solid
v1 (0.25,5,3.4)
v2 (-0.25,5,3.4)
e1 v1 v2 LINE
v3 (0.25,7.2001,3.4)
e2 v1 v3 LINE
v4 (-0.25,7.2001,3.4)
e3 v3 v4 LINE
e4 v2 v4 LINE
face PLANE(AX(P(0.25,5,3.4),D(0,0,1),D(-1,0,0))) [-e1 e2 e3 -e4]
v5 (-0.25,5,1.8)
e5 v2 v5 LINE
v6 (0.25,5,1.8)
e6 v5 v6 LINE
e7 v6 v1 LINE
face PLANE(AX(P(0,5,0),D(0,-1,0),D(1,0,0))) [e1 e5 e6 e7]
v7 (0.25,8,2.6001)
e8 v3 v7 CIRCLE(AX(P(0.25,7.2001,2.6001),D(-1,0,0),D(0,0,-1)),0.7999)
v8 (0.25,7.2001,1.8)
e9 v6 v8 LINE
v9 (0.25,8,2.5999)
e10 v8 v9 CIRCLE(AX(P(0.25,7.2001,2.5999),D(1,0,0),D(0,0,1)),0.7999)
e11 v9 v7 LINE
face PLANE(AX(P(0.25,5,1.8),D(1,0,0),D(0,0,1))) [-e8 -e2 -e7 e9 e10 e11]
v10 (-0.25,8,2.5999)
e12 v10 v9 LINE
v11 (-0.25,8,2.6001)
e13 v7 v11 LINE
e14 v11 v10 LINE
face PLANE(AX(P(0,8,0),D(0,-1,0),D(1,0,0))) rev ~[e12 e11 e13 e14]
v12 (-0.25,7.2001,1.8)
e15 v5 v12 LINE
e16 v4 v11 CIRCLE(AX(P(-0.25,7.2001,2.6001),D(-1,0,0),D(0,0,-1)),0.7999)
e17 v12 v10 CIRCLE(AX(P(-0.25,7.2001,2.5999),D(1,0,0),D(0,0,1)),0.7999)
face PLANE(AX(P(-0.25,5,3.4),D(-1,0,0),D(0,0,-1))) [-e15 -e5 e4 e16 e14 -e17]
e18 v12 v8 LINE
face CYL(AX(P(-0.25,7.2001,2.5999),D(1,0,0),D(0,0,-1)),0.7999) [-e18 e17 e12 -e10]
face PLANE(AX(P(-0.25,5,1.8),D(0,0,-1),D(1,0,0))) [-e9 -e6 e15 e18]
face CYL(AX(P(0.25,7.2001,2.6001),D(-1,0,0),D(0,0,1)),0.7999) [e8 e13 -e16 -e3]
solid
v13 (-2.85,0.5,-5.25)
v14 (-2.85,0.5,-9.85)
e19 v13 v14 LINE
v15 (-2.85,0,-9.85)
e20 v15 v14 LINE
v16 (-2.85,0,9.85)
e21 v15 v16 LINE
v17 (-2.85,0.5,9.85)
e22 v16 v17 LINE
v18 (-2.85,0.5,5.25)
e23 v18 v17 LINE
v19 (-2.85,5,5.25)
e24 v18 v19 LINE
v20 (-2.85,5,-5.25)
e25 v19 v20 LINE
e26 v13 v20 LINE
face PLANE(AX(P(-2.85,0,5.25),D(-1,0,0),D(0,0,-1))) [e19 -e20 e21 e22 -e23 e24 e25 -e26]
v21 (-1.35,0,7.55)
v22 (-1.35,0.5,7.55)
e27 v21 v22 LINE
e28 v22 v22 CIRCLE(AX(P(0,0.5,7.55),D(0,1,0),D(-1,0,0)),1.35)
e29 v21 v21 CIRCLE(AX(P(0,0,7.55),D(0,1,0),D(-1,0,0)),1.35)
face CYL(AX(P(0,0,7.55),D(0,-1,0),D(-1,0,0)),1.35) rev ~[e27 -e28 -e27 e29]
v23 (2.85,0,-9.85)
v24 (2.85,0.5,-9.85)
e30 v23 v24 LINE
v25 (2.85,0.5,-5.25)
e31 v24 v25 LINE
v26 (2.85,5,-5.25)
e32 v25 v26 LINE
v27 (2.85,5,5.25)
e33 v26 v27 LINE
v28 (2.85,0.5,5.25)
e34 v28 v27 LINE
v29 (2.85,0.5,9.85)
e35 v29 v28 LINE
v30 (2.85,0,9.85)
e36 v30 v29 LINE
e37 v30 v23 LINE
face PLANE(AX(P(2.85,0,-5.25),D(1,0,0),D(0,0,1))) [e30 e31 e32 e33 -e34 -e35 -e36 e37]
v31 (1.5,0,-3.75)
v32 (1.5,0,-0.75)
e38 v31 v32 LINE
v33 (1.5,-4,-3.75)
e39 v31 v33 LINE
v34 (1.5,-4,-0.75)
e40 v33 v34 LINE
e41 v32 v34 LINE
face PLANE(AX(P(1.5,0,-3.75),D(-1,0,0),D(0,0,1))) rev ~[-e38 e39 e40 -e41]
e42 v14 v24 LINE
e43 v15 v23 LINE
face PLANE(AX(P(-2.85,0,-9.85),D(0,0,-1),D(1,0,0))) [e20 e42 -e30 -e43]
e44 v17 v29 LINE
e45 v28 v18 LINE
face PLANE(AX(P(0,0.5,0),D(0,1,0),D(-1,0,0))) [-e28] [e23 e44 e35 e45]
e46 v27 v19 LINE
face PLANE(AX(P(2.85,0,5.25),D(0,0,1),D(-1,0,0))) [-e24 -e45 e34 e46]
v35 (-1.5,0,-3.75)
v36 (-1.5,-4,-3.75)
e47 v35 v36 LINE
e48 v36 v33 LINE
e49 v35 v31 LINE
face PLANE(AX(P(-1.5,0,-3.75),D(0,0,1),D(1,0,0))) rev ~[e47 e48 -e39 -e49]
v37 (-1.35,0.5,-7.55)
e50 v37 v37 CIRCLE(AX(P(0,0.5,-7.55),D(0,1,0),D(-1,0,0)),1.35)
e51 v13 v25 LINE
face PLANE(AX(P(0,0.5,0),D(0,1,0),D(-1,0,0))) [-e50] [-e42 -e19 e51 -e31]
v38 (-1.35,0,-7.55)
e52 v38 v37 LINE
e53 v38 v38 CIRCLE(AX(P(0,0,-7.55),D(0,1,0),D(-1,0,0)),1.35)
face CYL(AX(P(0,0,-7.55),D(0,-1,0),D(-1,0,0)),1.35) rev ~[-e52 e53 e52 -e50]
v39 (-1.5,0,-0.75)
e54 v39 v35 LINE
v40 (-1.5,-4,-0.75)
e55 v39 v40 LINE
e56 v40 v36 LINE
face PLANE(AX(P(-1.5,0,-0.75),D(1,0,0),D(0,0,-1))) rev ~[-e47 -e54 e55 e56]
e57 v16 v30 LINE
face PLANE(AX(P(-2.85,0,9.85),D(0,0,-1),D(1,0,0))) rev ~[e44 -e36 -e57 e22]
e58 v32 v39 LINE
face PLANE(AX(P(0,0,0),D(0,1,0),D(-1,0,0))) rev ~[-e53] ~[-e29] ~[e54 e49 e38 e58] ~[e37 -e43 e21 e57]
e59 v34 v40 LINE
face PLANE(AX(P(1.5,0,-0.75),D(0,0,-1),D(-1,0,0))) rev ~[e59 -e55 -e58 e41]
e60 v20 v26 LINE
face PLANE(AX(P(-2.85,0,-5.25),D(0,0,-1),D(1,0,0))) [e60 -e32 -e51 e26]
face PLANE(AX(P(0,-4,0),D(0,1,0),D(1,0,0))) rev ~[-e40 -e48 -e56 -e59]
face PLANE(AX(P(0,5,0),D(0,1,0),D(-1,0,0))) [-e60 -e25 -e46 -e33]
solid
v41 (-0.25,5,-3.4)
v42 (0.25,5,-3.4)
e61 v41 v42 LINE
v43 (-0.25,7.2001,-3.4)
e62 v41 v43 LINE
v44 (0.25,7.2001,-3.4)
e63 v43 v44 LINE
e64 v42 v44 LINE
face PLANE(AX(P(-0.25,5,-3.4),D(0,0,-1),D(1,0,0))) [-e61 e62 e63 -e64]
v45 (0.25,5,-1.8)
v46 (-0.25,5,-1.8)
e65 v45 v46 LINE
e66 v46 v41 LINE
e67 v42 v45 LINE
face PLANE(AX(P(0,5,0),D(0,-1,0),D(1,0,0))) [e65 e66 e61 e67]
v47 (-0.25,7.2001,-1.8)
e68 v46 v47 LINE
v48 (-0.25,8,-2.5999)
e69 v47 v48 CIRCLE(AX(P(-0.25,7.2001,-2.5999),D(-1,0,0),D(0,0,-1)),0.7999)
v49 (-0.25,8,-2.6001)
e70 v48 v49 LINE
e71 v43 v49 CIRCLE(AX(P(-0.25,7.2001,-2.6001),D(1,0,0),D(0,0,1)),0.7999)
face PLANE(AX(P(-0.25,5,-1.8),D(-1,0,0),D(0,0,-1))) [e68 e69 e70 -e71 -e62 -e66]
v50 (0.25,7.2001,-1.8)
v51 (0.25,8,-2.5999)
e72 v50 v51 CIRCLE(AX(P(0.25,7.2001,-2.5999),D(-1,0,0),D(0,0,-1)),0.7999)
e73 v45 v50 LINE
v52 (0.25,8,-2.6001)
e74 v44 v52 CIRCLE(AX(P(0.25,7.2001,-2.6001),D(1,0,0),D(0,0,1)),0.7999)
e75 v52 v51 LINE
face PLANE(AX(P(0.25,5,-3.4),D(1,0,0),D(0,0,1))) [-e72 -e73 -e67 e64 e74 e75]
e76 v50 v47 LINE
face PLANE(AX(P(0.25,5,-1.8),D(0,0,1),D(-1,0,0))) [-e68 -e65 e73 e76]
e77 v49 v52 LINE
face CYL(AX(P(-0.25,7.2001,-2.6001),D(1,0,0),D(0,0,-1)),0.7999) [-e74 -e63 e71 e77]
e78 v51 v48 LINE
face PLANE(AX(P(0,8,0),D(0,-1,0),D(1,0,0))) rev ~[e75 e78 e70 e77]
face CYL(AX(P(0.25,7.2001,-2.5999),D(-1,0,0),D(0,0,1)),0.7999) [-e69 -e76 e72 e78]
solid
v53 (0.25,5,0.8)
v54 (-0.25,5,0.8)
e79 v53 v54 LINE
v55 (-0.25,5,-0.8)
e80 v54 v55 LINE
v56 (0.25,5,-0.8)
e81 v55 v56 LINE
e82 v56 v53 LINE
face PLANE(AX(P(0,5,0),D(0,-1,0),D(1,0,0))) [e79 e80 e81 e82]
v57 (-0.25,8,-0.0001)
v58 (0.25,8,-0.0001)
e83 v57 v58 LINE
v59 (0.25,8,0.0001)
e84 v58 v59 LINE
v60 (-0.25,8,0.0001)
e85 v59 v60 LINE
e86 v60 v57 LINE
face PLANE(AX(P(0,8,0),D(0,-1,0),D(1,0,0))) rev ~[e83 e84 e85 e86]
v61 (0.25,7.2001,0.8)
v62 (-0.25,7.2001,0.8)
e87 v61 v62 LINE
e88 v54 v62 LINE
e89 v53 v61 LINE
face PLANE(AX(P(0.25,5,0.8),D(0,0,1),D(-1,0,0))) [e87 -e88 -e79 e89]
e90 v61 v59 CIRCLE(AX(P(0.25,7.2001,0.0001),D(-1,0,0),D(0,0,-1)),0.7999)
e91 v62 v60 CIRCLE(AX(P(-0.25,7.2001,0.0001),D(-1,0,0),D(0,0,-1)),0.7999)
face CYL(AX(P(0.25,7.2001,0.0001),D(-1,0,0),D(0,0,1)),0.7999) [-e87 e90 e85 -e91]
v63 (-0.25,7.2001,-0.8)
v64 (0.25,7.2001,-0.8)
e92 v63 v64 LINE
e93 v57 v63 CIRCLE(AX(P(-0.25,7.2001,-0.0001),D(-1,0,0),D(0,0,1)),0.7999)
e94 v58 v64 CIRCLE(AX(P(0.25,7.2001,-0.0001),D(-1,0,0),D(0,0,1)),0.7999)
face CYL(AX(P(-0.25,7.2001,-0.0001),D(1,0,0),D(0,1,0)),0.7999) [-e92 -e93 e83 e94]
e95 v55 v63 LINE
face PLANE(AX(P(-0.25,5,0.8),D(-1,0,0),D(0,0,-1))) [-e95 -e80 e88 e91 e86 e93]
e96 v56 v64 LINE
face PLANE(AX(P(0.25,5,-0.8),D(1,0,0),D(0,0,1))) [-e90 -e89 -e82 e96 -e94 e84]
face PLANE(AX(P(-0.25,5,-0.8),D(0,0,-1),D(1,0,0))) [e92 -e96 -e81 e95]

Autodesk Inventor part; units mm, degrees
ref_plane "YZ Plane" through (0, 0, 0) normal (1, 0, 0) x (0, 1, 0)
ref_plane "XZ Plane" through (0, 0, 0) normal (0, 1, 0) x (-1, 0, 0)
ref_plane "XY Plane" through (0, 0, 0) normal (0, 0, 1) x (1, 0, 0)
sketch "Sketch1" plane through (0, 0, 0) normal (0, 1, 0) x (-1, 0, 0)
  line L0 (-2.85, 5.25) -> (2.85, 5.25)
  line L1 (2.85, 5.25) -> (2.85, -5.25)
  line L2 (2.85, -5.25) -> (-2.85, -5.25)
  line L3 (-2.85, -5.25) -> (-2.85, 5.25)
  line L4 (-2.85, 5.25) -> (2.85, -5.25) construction
  line L5 (2.85, 5.25) -> (-2.85, -5.25) construction
  line L6 (2.85, -5.25) -> (2.85, -9.85)
  line L7 (2.85, -9.85) -> (-2.85, -9.85)
  line L8 (-2.85, -9.85) -> (-2.85, -5.25)
  circle A0 centre (0, -7.55) radius 1.35
  line L9 (0, 0) -> (2.85, 0)
  line L10 (2.85, 5.25) -> (2.85, 9.85)
  line L11 (2.85, 9.85) -> (-2.85, 9.85)
  line L12 (-2.85, 9.85) -> (-2.85, 5.25)
  circle A1 centre (0, 7.55) radius 1.35
  point P0 (2.85, -7.55)
  point P1 (0, -9.85)
  point P2 (2.85, 7.55)
  point P3 (0, 9.85)
  dimension "d0" = 10.5
  dimension "d1" = 5.7
  dimension "d2" = 9.85
  dimension "d3" = 2.7
extrude "Extrusion1" add sketch "Sketch1" along normal blind 5 contours L0 L1 L2 L3
extrude "Extrusion2" add sketch "Sketch1" along normal blind 0.5 contours L12 L11 L10 L0 | L2 L6 L7 L8
sketch "Sketch2" plane through (0, 0, 0) normal (0, 1, 0) x (1, 0, 0)
  line L0 (1.5, 0.75) -> (-1.5, 0.75)
  line L1 (-1.5, 0.75) -> (-1.5, 3.75)
  line L2 (-1.5, 3.75) -> (1.5, 3.75)
  line L3 (1.5, 3.75) -> (1.5, 0.75)
  line L4 (1.5, 0.75) -> (-1.5, 3.75) construction
  line L5 (-1.5, 0.75) -> (1.5, 3.75) construction
  line L6 (2.85, 5.25) -> (-2.85, 5.25) projected
  point P0 (0, 0)
  point P1 (0, 2.25)
  dimension "d8" = 3
  dimension "d9" = 3
  dimension "d10" = 1.5
extrude "Extrusion3" add sketch "Sketch2" against normal blind 4
sketch "Sketch3" plane through (0, 5, 0) normal (0, -1, 0) x (1, 0, 0)
  line L0 (0.25, 3.4) -> (-0.25, 3.4)
  line L1 (-0.25, 3.4) -> (-0.25, 1.8)
  line L2 (-0.25, 1.8) -> (0.25, 1.8)
  line L3 (0.25, 1.8) -> (0.25, 3.4)
  line L4 (0.25, 3.4) -> (-0.25, 1.8) construction
  line L5 (-0.25, 3.4) -> (0.25, 1.8) construction
  line L6 (-2.85, 5.25) -> (2.85, 5.25) projected
  line L7 (0.25, 0.8) -> (-0.25, 0.8)
  line L8 (-0.25, 0.8) -> (-0.25, -0.8)
  line L9 (-0.25, -0.8) -> (0.25, -0.8)
  line L10 (0.25, -0.8) -> (0.25, 0.8)
  line L11 (0.25, -1.8) -> (-0.25, -1.8)
  line L12 (-0.25, -1.8) -> (-0.25, -3.4)
  line L13 (-0.25, -3.4) -> (0.25, -3.4)
  line L14 (0.25, -3.4) -> (0.25, -1.8)
  line L15 (0.25, 0.8) -> (-0.25, -0.8)
  line L16 (-0.25, 0.8) -> (0.25, -0.8)
  point P0 (0, 0)
  point P1 (0, 2.6)
  point P2 (0, 0)
  dimension "d13" = 1.6
  dimension "d14" = 0.5
  dimension "d18" = 1.6
  dimension "d19" = 0.5
  dimension "d20" = 1.6
  dimension "d21" = 0.5
  dimension "d22" = 1
  dimension "d23" = 1
extrude "Extrusion4" add sketch "Sketch3" against normal blind 3 separate body
full round fillet "Full Round Fillet1" bodies 2 first side at (0.0833, 6, 3.4) centre faces at (0.0833, 8, 2.3333) second side at (-0.0833, 6, 1.8)
full round fillet "Full Round Fillet2" bodies 2 first side at (0.0833, 6, 0.8) centre faces at (0.0833, 8, -0.2667) second side at (-0.0833, 6, -0.8)
full round fillet "Full Round Fillet3" bodies 2 first side at (0.0833, 6, -1.8) centre faces at (0.0833, 8, -2.8667) second side at (-0.0833, 6, -3.4)
properties part number "switch"
